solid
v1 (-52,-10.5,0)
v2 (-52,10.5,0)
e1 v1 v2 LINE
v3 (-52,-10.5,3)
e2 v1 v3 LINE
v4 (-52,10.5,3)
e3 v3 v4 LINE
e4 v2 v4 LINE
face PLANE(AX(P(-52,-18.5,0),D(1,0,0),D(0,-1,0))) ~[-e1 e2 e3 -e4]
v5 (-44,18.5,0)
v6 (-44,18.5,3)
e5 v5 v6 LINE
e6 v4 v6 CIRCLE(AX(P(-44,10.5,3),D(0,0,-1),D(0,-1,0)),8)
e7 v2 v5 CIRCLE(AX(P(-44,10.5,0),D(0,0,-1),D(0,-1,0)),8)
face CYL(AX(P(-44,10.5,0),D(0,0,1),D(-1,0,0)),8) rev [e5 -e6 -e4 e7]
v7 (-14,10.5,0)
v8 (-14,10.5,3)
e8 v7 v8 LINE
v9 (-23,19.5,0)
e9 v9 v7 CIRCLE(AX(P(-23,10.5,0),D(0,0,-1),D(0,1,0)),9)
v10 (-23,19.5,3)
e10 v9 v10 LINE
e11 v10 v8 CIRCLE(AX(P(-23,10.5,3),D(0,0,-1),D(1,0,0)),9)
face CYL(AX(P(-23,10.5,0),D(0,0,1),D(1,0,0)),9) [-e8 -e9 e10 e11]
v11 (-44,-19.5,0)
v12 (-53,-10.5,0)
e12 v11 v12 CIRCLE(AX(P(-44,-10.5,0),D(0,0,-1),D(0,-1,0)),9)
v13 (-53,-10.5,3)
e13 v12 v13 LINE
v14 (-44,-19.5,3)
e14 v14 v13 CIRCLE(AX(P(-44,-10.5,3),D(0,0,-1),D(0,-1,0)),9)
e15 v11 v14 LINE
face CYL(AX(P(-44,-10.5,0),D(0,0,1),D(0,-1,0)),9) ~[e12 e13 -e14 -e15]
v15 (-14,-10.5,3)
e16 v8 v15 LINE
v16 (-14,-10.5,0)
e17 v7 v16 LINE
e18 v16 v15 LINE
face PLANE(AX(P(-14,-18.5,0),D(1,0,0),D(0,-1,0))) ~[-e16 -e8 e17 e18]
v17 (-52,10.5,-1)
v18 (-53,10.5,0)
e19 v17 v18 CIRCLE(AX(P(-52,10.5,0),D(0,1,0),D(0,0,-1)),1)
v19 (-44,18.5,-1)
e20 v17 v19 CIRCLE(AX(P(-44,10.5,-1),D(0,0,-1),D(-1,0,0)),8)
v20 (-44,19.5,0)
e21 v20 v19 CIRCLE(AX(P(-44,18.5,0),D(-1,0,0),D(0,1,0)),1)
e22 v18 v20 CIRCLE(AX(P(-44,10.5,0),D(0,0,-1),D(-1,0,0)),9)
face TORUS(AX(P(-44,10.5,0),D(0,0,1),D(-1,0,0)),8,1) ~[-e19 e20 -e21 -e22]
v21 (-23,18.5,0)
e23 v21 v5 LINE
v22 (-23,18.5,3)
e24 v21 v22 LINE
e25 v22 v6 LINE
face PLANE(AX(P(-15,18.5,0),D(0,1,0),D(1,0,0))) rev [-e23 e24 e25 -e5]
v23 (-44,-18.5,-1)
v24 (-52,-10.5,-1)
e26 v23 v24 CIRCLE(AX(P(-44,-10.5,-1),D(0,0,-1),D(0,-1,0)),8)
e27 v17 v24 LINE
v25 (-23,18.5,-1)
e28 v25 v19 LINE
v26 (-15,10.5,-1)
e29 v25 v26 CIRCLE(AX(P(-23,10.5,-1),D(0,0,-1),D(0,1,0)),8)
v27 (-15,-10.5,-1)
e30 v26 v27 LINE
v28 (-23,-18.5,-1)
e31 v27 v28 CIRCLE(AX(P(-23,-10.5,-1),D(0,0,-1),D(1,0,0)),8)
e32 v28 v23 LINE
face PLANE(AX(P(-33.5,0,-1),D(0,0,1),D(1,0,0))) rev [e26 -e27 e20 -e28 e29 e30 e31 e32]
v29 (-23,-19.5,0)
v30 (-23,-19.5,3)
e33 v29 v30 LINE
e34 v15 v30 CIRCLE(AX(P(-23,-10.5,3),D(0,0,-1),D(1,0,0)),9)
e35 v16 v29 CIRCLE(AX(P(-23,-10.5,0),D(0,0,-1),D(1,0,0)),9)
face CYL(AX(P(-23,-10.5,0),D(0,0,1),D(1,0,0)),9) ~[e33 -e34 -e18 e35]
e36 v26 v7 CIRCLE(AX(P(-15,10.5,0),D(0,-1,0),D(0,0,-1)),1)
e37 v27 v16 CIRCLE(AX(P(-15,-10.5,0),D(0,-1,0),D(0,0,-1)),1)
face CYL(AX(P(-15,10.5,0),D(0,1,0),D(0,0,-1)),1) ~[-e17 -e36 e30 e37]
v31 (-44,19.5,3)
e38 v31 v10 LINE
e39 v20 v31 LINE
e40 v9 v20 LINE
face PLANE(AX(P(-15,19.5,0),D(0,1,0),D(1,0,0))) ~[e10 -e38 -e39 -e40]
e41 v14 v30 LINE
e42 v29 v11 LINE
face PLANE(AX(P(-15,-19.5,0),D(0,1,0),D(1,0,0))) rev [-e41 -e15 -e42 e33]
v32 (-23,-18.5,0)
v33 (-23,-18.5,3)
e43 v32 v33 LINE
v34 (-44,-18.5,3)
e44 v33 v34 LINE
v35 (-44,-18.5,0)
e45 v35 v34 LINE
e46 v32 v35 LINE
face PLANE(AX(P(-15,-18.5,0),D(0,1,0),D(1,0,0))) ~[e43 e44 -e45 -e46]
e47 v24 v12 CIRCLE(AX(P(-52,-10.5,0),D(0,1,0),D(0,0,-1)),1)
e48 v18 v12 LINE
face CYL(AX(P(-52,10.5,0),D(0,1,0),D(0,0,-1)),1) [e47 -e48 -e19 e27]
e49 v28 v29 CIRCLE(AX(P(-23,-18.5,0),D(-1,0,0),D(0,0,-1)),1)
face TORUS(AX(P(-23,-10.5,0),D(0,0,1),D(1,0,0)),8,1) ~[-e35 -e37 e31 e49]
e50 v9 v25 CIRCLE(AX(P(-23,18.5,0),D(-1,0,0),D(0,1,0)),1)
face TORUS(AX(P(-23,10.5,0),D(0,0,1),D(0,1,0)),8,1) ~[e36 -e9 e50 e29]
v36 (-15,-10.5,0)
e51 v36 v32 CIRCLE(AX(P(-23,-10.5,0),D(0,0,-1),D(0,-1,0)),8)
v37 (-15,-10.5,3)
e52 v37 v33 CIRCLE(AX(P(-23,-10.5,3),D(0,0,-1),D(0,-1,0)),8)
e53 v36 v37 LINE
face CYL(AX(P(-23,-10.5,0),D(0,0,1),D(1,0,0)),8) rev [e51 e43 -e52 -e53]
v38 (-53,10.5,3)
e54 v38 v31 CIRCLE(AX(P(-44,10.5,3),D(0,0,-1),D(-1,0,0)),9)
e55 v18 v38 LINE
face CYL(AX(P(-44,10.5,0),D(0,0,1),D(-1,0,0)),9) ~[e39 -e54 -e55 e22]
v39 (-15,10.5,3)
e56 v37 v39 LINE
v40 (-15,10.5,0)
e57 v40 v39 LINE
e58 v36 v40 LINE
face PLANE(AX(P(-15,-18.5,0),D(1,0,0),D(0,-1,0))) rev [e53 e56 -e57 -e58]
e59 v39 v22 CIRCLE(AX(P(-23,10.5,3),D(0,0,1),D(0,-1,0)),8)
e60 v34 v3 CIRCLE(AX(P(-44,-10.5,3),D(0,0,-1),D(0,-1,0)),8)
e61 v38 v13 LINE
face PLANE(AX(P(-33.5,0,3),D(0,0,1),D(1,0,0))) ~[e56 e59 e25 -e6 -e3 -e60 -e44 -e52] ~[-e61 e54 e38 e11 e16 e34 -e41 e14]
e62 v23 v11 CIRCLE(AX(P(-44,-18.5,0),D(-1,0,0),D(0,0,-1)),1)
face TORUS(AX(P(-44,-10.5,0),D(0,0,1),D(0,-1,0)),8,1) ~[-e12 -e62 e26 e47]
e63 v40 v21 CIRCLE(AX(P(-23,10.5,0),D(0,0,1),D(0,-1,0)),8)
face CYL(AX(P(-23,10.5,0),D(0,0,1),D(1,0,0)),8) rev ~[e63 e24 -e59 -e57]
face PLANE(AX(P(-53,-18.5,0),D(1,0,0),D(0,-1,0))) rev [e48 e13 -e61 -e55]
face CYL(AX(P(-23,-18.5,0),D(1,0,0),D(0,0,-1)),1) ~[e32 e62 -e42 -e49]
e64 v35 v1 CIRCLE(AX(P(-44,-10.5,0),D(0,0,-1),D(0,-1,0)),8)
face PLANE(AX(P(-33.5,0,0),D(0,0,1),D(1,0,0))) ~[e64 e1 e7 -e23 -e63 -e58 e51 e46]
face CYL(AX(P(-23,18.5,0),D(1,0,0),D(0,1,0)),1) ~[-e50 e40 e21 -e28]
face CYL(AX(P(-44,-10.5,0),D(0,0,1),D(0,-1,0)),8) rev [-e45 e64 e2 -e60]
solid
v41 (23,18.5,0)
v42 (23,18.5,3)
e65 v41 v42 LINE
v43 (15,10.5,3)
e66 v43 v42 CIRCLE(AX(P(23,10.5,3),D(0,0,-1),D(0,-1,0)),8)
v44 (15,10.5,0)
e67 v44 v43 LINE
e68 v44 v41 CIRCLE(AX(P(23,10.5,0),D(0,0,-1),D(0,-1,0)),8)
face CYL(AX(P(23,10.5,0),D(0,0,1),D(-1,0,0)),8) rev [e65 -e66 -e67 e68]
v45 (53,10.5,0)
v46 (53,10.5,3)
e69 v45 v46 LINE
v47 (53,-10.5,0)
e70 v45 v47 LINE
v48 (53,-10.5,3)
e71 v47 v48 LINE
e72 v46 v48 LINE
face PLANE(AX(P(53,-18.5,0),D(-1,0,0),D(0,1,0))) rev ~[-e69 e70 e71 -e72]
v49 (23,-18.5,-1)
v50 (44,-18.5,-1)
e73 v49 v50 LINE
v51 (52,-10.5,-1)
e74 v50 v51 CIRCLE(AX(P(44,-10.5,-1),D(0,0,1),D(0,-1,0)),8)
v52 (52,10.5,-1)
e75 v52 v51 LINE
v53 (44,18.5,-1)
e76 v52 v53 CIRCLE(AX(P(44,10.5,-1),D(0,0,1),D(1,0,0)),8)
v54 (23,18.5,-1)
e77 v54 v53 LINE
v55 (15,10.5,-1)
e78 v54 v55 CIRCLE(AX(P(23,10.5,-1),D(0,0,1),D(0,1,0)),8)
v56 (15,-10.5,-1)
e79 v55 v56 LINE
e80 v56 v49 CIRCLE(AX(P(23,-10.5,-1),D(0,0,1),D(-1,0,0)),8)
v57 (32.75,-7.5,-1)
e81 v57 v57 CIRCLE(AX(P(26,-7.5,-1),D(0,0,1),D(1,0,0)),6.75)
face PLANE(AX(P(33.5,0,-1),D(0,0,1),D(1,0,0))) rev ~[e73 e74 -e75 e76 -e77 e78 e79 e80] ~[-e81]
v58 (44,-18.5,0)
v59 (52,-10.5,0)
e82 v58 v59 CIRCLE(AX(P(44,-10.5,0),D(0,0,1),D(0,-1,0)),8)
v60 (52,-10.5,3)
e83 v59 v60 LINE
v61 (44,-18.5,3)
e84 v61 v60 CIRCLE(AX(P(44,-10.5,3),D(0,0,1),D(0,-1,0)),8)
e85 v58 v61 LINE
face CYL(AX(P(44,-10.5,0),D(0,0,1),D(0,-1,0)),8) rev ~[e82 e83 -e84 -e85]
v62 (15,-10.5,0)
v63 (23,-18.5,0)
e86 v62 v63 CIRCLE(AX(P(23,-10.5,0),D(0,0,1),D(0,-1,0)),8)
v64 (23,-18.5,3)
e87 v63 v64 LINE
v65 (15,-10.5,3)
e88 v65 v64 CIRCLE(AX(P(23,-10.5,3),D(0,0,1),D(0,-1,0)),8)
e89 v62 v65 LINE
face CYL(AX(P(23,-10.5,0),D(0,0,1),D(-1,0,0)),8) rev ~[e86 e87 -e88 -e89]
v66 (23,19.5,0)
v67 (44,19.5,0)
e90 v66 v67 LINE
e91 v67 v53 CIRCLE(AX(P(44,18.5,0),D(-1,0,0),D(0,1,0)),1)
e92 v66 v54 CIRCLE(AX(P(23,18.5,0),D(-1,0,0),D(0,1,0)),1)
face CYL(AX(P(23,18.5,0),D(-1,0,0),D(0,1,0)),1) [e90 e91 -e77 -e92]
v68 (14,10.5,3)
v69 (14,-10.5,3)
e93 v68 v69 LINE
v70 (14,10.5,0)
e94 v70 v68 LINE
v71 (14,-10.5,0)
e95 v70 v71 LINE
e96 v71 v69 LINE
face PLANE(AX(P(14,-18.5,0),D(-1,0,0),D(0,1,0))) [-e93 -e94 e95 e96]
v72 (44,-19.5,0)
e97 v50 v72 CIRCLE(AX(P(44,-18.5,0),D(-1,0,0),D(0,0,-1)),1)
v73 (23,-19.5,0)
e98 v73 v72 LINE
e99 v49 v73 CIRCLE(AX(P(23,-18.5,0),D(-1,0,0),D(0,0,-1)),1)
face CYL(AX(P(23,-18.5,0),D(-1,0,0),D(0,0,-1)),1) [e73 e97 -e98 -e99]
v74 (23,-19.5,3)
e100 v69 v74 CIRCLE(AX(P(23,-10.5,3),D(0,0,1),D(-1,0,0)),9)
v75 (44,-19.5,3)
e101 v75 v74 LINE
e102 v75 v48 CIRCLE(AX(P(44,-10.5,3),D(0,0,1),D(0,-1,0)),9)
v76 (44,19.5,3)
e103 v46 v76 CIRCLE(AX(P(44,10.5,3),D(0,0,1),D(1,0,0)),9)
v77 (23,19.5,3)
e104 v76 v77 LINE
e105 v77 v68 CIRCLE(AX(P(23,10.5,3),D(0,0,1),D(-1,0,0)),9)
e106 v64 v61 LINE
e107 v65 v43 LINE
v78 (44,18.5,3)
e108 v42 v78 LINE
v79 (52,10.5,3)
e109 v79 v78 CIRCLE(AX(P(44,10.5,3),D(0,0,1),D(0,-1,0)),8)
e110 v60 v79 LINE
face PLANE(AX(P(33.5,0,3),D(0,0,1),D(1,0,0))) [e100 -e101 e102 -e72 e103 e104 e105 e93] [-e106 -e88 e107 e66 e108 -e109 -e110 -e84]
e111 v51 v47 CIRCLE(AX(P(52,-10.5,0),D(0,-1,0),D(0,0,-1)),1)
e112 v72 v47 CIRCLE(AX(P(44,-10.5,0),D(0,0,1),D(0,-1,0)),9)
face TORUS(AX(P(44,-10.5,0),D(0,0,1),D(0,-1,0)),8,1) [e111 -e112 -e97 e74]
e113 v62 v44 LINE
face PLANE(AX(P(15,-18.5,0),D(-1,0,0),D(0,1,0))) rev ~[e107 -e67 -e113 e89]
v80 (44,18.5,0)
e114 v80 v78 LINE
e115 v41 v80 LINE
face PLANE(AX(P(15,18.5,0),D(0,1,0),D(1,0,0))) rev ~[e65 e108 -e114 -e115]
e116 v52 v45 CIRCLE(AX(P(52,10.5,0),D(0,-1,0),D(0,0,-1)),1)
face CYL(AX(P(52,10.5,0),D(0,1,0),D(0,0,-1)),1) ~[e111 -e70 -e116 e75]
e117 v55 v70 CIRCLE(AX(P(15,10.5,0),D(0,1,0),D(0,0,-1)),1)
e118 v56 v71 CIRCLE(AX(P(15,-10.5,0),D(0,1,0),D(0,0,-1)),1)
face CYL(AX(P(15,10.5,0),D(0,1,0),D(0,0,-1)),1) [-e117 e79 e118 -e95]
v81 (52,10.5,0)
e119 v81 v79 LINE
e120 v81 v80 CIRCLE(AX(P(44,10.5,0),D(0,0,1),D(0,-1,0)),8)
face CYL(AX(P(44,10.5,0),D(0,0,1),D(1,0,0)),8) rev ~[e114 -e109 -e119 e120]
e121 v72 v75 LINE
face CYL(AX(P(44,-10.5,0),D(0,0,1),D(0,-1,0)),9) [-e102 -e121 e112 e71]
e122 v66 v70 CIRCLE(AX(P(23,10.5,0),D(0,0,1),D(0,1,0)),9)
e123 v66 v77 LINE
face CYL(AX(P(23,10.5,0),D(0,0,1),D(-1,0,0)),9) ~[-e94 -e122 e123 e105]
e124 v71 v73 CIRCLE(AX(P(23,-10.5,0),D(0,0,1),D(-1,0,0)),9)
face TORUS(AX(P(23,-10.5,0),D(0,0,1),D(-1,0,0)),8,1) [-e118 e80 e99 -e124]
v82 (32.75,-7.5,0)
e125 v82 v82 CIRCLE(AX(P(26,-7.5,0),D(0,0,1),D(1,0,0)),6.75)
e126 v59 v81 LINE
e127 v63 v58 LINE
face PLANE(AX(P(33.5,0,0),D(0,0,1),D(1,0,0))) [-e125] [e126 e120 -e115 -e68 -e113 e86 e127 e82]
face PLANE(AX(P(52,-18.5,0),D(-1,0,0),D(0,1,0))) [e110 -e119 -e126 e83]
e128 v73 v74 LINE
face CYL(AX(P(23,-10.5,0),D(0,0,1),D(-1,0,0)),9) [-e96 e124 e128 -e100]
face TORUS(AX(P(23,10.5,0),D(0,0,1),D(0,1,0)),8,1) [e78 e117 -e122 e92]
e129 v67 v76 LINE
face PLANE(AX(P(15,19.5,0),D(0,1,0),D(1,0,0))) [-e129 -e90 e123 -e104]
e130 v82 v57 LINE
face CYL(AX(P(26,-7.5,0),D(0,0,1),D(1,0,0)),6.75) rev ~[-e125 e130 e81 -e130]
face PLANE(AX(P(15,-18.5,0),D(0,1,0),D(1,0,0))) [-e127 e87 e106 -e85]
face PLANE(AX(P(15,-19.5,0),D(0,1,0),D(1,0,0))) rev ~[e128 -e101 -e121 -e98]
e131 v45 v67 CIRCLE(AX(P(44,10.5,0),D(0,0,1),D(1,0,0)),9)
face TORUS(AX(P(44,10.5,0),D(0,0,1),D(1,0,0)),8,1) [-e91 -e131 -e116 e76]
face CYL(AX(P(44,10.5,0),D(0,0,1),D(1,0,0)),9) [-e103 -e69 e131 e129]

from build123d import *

# Parameters (mm, degrees)
F0_W         = 37
F0_H         = 37
F1_DEPTH     = 3
F2_R         = 8
F3_T         = 1
F4_T1_DEPTH  = 21
F4_T3_DEPTH  = 21
F4_T6_ANGLE  = 90
F4_T8_ANGLE  = 90
F4_T10_ANGLE = 90
F4_T12_ANGLE = 90
F6_R         = 6.75
F7_DEPTH     = 1


# Not quite as in the source:
# - a fillet or chamfer that OpenCascade refuses, or shapes differently, is made with other operations: its cross-section is extruded or revolved along the edge and cut away or added


with BuildPart() as f1:
    # F0 (on Top) → F1 (new body)
    with BuildSketch(Plane.XY):
        with Locations((33.5, 0)):
            Rectangle(F0_W, F0_H)
    extrude(amount=F1_DEPTH)

    # F2
    f2_edges = [f1.edges().sort_by_distance(p)[0] for p in [
        (15, 18.5, 1.5),
        (52, 18.5, 1.5),
        (52, -18.5, 1.5),
        (15, -18.5, 1.5),
    ]]
    fillet(f2_edges, radius=F2_R)

    # F3
    f3_openings = [f1.faces().sort_by_distance(p)[0] for p in [
        (33.5, 0, 3),
    ]]
    offset(amount=F3_T, openings=f3_openings, kind=Kind.INTERSECTION)

    # F4: fillet of radius 1 on 8 edges, made by hand

    # F4_s2 → F4_t1 (cut)
    with BuildSketch(Plane.YZ.offset(23)):
        with BuildLine():
            ThreePointArc((19.5, 0), (19.2071067812, -0.7071067812), (18.5, -1))
            Line((18.5, -1), (19.5, -1))
            Line((19.5, -1), (19.5, 0))
        make_face()
        with BuildLine():
            ThreePointArc((-18.5, -1), (-19.2071067812, -0.7071067812), (-19.5, 0))
            Line((-19.5, 0), (-19.5, -1))
            Line((-19.5, -1), (-18.5, -1))
        make_face()
    extrude(amount=F4_T1_DEPTH, mode=Mode.SUBTRACT)

    # F4_s4 → F4_t3 (cut)
    with BuildSketch(Plane.XZ.offset(-10.5)):
        with BuildLine():
            ThreePointArc((15, -1), (14.2928932188, -0.7071067812), (14, 0))
            Line((14, 0), (14, -1))
            Line((14, -1), (15, -1))
        make_face()
        with BuildLine():
            ThreePointArc((52, -1), (52.7071067812, -0.7071067812), (53, 0))
            Line((53, 0), (53, -1))
            Line((53, -1), (52, -1))
        make_face()
    extrude(amount=F4_T3_DEPTH, mode=Mode.SUBTRACT)

    # F4_s5 → F4_t6 (revolve, cut)
    with BuildSketch(Plane.XZ.offset(-10.5)):
        with BuildLine():
            ThreePointArc((52, -1), (52.7071067812, -0.7071067812), (53, 0))
            Line((53, 0), (53, -1))
            Line((53, -1), (52, -1))
        make_face()
    revolve(axis=Axis((44, 10.5, -1), (0, 0, 1)), revolution_arc=F4_T6_ANGLE, mode=Mode.SUBTRACT)

    # F4_s7 → F4_t8 (revolve, cut)
    with BuildSketch(Plane.YZ.offset(23)):
        with BuildLine():
            ThreePointArc((18.5, -1), (19.2071067812, -0.7071067812), (19.5, 0))
            Line((19.5, 0), (19.5, -1))
            Line((19.5, -1), (18.5, -1))
        make_face()
    revolve(axis=Axis((23, 10.5, -1), (0, 0, 1)), revolution_arc=F4_T8_ANGLE, mode=Mode.SUBTRACT)

    # F4_s9 → F4_t10 (revolve, cut)
    with BuildSketch(Plane.XZ.offset(10.5)):
        with BuildLine():
            ThreePointArc((15, -1), (14.2928932188, -0.7071067812), (14, 0))
            Line((14, 0), (14, -1))
            Line((14, -1), (15, -1))
        make_face()
    revolve(axis=Axis((23, -10.5, -1), (0, 0, 1)), revolution_arc=F4_T10_ANGLE, mode=Mode.SUBTRACT)

    # F4_s11 → F4_t12 (revolve, cut)
    with BuildSketch(Plane.YZ.offset(44)):
        with BuildLine():
            ThreePointArc((-18.5, -1), (-19.2071067812, -0.7071067812), (-19.5, 0))
            Line((-19.5, 0), (-19.5, -1))
            Line((-19.5, -1), (-18.5, -1))
        make_face()
    revolve(axis=Axis((44, -10.5, -1), (0, 0, 1)), revolution_arc=F4_T12_ANGLE, mode=Mode.SUBTRACT)


with BuildPart() as f5_1:
    # F5: instance of F1
    add(f1.part.mirror(Plane.YZ))


with BuildPart() as f1_1:
    add(f1.part)

    # F6 (on face) → F7 (cut, through all)
    with BuildSketch(Plane.XY):
        with Locations((26, -7.5)):
            Circle(F6_R)
    extrude(amount=-F7_DEPTH, mode=Mode.SUBTRACT)


solid = Compound([f5_1.part, f1_1.part])
